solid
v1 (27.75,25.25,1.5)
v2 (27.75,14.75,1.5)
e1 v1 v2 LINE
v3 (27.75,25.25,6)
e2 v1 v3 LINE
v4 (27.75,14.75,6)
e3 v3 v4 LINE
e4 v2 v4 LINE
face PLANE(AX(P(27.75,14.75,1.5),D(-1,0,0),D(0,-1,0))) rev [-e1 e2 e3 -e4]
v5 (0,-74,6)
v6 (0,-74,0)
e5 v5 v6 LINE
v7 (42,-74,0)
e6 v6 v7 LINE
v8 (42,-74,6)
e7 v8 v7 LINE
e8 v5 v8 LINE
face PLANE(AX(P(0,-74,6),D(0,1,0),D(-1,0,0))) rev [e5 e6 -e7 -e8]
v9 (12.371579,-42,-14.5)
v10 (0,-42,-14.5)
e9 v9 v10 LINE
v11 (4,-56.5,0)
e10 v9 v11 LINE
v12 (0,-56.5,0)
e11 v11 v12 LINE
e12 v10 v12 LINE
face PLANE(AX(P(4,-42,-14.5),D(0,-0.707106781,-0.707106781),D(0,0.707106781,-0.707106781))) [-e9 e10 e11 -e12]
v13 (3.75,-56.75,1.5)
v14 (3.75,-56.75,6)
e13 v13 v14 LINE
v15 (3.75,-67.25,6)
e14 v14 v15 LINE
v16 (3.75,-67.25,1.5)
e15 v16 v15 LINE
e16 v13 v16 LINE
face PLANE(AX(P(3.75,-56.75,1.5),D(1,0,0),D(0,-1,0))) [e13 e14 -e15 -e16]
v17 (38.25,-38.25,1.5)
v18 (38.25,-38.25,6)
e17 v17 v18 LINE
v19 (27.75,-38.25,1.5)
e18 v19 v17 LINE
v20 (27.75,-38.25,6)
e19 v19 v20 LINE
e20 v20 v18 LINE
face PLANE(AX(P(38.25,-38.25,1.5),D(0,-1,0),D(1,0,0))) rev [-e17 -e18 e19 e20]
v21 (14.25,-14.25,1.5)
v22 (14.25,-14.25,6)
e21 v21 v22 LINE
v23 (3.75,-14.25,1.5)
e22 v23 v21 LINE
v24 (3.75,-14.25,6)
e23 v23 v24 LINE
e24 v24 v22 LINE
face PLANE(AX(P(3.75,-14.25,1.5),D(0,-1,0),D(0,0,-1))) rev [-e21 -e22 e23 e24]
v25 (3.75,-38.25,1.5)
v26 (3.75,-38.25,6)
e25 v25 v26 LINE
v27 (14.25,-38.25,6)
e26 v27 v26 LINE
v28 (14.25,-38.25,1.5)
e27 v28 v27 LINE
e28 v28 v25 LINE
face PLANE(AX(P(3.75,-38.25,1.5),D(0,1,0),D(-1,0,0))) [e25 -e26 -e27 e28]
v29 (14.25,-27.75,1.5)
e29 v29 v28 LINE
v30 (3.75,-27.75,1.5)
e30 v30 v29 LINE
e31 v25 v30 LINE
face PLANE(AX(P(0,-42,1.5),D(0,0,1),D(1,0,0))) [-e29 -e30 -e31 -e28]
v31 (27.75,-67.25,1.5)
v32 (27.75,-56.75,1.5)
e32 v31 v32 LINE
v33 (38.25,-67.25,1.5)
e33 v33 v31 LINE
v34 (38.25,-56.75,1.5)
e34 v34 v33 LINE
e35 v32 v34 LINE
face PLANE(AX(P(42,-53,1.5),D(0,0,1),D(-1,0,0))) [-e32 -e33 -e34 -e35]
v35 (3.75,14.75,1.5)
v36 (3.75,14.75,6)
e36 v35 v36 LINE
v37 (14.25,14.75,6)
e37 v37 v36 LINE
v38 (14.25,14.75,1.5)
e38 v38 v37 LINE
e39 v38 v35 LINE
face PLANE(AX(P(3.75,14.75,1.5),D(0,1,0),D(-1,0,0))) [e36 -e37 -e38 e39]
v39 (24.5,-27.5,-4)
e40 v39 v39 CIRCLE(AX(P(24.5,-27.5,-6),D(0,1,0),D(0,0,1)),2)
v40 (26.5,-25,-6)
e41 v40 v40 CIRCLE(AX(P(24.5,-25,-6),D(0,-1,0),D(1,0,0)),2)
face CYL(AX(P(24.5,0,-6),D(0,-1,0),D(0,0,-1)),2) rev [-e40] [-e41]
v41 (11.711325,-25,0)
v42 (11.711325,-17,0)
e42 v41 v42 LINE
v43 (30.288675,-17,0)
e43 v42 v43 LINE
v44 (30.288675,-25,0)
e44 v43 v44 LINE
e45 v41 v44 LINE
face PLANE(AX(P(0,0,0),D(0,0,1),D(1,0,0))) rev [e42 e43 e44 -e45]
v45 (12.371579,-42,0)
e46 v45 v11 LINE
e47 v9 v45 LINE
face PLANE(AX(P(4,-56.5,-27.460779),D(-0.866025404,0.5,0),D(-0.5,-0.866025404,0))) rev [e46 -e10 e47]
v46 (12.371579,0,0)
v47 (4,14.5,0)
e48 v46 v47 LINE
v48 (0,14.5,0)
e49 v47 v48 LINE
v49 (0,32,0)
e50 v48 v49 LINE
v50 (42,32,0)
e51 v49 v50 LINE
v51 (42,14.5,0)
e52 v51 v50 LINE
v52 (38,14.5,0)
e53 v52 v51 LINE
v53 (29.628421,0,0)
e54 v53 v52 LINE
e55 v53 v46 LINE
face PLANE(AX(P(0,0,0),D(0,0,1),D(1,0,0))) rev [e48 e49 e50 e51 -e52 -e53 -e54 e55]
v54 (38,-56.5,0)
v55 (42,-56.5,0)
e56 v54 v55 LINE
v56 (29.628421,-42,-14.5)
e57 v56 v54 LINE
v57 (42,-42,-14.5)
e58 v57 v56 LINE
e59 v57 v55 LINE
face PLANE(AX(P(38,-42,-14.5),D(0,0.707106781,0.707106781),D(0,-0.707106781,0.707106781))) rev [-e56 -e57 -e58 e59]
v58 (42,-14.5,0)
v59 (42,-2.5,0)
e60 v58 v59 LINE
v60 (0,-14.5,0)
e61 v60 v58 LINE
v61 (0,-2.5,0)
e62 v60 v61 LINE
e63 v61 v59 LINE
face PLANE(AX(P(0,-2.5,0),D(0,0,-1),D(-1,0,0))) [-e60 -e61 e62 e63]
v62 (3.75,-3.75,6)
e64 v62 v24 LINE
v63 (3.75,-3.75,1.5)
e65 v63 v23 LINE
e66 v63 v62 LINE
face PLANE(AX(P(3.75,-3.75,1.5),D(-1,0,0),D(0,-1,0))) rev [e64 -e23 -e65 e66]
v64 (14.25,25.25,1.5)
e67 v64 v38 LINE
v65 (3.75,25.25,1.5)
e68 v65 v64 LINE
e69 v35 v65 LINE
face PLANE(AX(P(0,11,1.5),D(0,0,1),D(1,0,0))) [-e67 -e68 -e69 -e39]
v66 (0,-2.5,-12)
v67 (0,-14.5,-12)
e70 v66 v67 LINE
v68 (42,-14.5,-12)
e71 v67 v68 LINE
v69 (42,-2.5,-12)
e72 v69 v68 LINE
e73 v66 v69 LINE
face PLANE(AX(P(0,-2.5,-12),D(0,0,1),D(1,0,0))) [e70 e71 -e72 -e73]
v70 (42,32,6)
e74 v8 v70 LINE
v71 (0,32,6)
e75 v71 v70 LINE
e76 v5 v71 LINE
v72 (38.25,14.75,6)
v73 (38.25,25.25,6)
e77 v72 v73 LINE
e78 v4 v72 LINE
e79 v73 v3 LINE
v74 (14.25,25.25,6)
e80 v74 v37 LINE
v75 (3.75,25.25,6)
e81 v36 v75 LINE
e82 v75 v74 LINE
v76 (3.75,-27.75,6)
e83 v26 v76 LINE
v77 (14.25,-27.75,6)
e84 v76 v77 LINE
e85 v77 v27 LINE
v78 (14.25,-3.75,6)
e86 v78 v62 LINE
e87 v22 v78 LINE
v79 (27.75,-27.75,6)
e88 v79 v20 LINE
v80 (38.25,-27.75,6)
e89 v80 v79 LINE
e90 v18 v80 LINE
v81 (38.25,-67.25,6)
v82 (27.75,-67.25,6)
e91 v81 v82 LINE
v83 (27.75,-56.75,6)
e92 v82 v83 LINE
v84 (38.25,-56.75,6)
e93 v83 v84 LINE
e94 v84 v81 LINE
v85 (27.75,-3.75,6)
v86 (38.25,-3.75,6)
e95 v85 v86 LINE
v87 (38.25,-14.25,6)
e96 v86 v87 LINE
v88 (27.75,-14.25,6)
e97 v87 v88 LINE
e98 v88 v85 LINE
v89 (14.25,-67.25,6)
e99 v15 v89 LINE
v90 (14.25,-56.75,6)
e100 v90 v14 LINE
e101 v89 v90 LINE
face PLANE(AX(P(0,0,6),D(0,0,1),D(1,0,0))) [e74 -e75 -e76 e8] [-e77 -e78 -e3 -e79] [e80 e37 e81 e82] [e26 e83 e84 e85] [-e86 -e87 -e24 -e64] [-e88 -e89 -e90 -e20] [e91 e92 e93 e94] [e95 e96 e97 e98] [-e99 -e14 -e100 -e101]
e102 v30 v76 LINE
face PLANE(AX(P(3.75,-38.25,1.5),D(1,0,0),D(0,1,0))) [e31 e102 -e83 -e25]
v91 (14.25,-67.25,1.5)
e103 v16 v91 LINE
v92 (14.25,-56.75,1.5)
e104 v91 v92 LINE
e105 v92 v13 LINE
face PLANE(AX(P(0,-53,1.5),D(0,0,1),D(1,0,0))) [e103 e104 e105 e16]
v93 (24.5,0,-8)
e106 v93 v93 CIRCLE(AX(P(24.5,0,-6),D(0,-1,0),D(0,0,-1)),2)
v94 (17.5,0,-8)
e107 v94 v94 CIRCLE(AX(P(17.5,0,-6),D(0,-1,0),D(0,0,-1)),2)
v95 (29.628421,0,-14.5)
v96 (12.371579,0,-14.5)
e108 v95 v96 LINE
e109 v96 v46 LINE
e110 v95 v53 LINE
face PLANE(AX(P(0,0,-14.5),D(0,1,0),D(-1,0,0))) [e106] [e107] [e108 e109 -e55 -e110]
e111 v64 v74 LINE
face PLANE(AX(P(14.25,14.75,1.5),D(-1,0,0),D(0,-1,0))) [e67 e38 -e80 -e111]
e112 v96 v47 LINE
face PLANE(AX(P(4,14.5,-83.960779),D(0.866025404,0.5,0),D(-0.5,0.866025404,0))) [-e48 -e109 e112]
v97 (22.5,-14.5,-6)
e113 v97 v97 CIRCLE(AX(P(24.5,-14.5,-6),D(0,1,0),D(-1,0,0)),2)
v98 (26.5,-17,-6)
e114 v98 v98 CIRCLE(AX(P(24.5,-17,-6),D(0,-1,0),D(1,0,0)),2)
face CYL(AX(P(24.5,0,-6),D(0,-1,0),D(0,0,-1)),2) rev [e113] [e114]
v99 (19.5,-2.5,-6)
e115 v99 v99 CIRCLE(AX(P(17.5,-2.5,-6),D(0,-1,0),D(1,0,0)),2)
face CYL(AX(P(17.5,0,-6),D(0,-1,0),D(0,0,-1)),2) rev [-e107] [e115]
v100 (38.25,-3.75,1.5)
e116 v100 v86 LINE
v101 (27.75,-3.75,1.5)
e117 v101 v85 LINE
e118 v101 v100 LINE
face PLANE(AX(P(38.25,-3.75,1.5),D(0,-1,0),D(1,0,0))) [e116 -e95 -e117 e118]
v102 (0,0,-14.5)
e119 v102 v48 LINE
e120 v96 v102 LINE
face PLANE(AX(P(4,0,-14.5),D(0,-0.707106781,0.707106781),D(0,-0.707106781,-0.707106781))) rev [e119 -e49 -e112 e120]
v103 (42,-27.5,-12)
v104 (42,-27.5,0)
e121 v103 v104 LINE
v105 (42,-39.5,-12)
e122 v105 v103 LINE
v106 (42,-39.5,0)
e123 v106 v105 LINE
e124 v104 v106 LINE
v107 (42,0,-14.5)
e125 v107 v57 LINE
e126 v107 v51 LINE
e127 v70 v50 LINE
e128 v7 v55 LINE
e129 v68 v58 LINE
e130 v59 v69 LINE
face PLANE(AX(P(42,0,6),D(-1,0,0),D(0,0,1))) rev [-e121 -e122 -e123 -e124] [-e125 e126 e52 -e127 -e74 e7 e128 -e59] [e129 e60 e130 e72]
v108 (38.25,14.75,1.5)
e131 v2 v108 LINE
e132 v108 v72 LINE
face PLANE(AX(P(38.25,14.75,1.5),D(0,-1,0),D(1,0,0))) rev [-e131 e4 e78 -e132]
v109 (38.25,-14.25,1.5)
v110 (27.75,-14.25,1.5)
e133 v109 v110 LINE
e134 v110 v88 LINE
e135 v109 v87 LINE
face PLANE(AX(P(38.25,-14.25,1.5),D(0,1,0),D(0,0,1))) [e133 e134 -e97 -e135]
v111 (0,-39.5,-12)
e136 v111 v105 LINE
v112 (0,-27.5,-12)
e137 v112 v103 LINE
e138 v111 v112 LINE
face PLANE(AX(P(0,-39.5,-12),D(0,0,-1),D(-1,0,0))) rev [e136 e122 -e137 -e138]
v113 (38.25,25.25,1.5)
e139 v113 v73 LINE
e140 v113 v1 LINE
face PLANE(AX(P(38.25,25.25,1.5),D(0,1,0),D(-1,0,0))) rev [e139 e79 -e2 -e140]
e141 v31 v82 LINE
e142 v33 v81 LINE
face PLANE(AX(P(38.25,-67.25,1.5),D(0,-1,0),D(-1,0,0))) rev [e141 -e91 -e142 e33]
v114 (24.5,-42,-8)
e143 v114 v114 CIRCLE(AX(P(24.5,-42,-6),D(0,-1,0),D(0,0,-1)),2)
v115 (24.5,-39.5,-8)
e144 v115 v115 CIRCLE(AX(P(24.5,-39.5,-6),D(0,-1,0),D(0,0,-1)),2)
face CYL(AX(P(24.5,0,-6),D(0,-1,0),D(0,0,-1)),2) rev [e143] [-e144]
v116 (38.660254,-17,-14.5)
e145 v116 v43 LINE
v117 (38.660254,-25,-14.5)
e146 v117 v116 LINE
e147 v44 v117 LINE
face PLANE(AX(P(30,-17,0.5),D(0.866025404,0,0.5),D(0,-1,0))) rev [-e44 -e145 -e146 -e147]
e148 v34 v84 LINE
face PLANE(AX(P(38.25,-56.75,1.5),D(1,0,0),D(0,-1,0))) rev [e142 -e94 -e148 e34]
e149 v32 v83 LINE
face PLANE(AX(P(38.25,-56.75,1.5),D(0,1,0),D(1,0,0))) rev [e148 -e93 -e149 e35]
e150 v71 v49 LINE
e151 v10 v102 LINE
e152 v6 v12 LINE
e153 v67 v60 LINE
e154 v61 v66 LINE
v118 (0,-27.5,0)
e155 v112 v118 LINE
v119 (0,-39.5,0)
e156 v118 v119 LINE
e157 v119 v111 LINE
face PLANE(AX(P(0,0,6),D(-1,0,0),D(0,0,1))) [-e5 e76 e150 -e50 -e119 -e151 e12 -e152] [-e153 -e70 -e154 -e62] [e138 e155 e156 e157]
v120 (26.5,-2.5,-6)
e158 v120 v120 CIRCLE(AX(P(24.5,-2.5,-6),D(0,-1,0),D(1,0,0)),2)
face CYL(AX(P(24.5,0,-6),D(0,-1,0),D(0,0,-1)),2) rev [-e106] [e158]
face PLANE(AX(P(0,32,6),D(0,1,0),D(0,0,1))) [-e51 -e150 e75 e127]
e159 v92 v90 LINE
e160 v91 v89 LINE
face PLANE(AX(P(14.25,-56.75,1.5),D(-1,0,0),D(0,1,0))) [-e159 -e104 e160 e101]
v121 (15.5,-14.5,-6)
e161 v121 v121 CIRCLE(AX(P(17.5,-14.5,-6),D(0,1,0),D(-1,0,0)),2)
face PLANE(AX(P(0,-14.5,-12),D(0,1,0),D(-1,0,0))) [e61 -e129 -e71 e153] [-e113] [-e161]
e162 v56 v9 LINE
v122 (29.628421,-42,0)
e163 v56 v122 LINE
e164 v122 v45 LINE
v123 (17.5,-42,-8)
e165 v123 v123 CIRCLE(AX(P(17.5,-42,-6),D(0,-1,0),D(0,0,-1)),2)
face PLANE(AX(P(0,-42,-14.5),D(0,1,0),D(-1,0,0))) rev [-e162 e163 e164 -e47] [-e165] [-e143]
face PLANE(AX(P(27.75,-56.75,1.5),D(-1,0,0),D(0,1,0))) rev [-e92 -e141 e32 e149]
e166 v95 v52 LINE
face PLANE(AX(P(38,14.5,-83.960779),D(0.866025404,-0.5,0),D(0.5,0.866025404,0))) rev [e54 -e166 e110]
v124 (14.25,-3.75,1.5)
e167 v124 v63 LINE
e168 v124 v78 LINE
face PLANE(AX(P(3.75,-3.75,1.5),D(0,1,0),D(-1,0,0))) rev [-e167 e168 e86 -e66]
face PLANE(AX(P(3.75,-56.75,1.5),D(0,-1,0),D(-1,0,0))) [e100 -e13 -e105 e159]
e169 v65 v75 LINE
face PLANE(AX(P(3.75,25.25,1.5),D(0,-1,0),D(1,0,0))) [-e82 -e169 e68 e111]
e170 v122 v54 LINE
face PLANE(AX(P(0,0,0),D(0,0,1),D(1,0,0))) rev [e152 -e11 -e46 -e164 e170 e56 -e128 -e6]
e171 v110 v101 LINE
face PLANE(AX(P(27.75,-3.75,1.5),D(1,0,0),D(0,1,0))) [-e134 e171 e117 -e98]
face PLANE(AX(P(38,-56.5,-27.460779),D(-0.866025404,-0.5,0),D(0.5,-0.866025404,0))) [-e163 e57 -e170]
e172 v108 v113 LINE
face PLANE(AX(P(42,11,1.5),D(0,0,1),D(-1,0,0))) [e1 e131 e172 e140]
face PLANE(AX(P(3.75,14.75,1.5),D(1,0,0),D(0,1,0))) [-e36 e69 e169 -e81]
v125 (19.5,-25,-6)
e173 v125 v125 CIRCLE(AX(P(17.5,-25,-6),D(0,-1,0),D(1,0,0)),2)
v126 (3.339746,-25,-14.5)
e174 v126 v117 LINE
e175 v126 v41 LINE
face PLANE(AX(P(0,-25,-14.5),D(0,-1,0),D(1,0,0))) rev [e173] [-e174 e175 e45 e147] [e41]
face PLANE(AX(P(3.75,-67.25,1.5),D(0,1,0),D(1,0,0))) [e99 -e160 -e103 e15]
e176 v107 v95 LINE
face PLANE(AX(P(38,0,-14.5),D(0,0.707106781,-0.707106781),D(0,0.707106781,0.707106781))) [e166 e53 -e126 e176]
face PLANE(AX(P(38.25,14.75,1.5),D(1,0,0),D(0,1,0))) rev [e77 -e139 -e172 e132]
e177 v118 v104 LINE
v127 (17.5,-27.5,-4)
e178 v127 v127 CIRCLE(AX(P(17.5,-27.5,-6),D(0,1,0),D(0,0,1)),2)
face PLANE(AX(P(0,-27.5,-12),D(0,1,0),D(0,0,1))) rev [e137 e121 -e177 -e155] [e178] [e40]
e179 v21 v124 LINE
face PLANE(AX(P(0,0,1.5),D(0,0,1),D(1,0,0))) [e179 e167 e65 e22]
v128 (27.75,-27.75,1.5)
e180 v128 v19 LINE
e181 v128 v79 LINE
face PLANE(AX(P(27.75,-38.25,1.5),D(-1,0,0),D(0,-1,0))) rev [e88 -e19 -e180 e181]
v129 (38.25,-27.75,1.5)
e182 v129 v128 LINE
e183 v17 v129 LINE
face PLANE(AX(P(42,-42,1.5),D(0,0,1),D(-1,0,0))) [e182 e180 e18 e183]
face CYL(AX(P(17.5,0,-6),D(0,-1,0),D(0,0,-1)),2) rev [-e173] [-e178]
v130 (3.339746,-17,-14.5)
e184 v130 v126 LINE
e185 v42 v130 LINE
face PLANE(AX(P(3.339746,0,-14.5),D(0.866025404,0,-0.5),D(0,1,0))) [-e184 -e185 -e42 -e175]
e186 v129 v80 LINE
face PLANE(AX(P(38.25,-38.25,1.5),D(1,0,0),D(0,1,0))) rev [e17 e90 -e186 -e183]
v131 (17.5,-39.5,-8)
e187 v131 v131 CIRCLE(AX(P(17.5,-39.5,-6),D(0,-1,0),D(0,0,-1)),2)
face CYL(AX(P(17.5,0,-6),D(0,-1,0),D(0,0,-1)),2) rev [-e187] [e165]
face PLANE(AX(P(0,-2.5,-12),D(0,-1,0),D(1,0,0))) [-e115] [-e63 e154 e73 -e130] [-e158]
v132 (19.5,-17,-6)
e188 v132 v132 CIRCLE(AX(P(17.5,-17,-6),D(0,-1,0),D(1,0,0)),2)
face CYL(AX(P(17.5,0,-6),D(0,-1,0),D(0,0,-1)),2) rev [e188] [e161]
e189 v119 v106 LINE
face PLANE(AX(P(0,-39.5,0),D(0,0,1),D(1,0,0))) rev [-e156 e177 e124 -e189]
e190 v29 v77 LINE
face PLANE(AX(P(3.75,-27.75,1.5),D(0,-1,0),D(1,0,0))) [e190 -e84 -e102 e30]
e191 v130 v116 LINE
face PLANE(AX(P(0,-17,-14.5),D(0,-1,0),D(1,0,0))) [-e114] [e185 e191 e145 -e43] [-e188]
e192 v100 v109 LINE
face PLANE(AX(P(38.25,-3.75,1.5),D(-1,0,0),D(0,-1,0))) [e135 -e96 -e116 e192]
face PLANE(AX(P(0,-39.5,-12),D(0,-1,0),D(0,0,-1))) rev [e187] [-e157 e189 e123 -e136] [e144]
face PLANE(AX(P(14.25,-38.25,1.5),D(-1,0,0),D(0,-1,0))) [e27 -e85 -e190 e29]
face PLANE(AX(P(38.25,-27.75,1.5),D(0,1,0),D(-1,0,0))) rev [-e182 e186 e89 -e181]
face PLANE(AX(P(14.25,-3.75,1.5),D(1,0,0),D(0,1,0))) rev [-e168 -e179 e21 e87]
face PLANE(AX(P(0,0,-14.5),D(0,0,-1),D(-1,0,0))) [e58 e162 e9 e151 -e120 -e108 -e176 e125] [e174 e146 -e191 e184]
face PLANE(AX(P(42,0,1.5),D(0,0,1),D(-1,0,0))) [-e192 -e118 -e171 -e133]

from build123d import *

# Parameters (mm, degrees)
ESQUISSE1_W                  = 42
ESQUISSE1_H                  = 106
BOSS_EXTRU_1_DEPTH           = 6
ESQUISSE2_W                  = 42
ESQUISSE2_H                  = 17
BOSS_EXTRU_3_DEPTH           = 14.5
ESQUISSE3_W                  = 12
ESQUISSE3_H                  = 12
ENL_V_MAT_EXTRU_3_DEPTH      = 87.314830707
ESQUISSE4_R                  = 2
ENL_V_MAT_EXTRU_4_DEPTH      = 42
ESQUISSE5_W                  = 10.5
ESQUISSE5_H                  = 10.5
ENL_V_MAT_EXTRU_5_DEPTH      = 4.5
SYM_TRIE3_COPY_1_SKETCH_W    = 10.5
SYM_TRIE3_COPY_1_SKETCH_H    = 10.5
SYM_TRIE3_COPY_1_DEPTH       = 4.5
SYM_TRIE4_COPY_1_SKETCH_W    = 10.5
SYM_TRIE4_COPY_1_SKETCH_H    = 10.5
SYM_TRIE4_COPY_1_DEPTH       = 4.5
SYM_TRIE5_COPY_1_SKETCH_W    = 10.5
SYM_TRIE5_COPY_1_SKETCH_H    = 10.5
SYM_TRIE5_COPY_1_DEPTH       = 4.5
SYM_TRIE5_COPY_2_SKETCH_W    = 10.5
SYM_TRIE5_COPY_2_SKETCH_H    = 10.5
SYM_TRIE5_COPY_2_DEPTH       = 4.5
SYM_TRIE5_COPY_3_SKETCH_W    = 10.5
SYM_TRIE5_COPY_3_SKETCH_H    = 10.5
SYM_TRIE5_COPY_3_DEPTH       = 4.5
BOSS_EXTRU_4_DEPTH           = 4
BOSS_EXTRU_5_REACH           = 88.315
R_P_TITION_CIRCULAIRE1_COUNT = 2
SYM_TRIE6_COPY_1_DEPTH       = 4
SYM_TRIE6_COPY_2_REACH       = 88.315
ESQUISSE8_W                  = 12
ESQUISSE8_H                  = 8
BOSS_EXTRU_6_DEPTH           = 14.5
CHANFREIN2_SIZE              = 15
CHANFREIN2_SIZE_2            = 8.660254038
SYM_TRIE7_START              = -25
SYM_TRIE7_DEPTH              = 8


# Read off the part's stored shape, not the designer's step: Symétrie7
with BuildPart() as part:
    # Esquisse1 → Boss.-Extru.1 (new body)
    with BuildSketch(Plane.XY):
        with Locations((21, -21)):
            Rectangle(ESQUISSE1_W, ESQUISSE1_H)
    extrude(amount=BOSS_EXTRU_1_DEPTH)

    # Esquisse2 → Boss.-Extru.3 (add)
    with BuildSketch(Plane(origin=(0, 0, 0), x_dir=(-1, 0, 0), z_dir=(0, 0, -1))):
        with Locations((-21, -33.5)):
            Rectangle(ESQUISSE2_W, ESQUISSE2_H)
    boss_extru_3 = extrude(amount=BOSS_EXTRU_3_DEPTH)

    # Esquisse3 → Enlèv. mat.-Extru.3 (cut, through all)
    with BuildSketch(Plane(origin=(42, 0, 0), x_dir=(0, 0, -1), z_dir=(1, 0, 0))):
        with Locations((6, -33.5)):
            Rectangle(ESQUISSE3_W, ESQUISSE3_H)
    enl_v_mat_extru_3 = extrude(amount=-ENL_V_MAT_EXTRU_3_DEPTH, mode=Mode.SUBTRACT)

    # Symétrie1: Boss.-Extru.3, Enlèv. mat.-Extru.3 across plane
    add(boss_extru_3.mirror(Plane(origin=(0, -21, 0), x_dir=(0, 0, 1), z_dir=(0, -1, 0))))
    add(enl_v_mat_extru_3.mirror(Plane(origin=(0, -21, 0), x_dir=(0, 0, 1), z_dir=(0, -1, 0))), mode=Mode.SUBTRACT)

    # Esquisse4 → Enlèv. mat.-Extru.4 (cut)
    with BuildSketch(Plane.XZ.offset(42)):
        with Locations(Location((24.5, -6, 0), (0, 0, 270))):
            Circle(ESQUISSE4_R)
        with Locations(Location((17.5, -6, 0), (0, 0, 270))):
            Circle(ESQUISSE4_R)
    extrude(amount=-ENL_V_MAT_EXTRU_4_DEPTH, mode=Mode.SUBTRACT)

    # Esquisse5 → Enlèv. mat.-Extru.5 (cut)
    with BuildSketch(Plane.XY.offset(6)):
        with Locations((9, -9)):
            Rectangle(ESQUISSE5_W, ESQUISSE5_H)
    enl_v_mat_extru_5 = extrude(amount=-ENL_V_MAT_EXTRU_5_DEPTH, mode=Mode.SUBTRACT)

    # Symétrie2: Enlèv. mat.-Extru.5 across plane
    add(enl_v_mat_extru_5.mirror(Plane(origin=(21, 0, 0), x_dir=(0, 0, 1), z_dir=(1, 0, 0))), mode=Mode.SUBTRACT)

    # Symétrie3: Enlèv. mat.-Extru.5 across plane
    add(enl_v_mat_extru_5.mirror(Plane(origin=(0, -21, 0), x_dir=(0, 0, 1), z_dir=(0, -1, 0))), mode=Mode.SUBTRACT)

    # Symétrie3 copy 1 sketch → Symétrie3 copy 1 (cut)
    with BuildSketch(Plane(origin=(42, -42, 6), x_dir=(-1, 0, 0), z_dir=(0, 0, 1))):
        with Locations((9, -9)):
            Rectangle(SYM_TRIE3_COPY_1_SKETCH_W, SYM_TRIE3_COPY_1_SKETCH_H)
    extrude(amount=-SYM_TRIE3_COPY_1_DEPTH, mode=Mode.SUBTRACT)

    # Symétrie4: Enlèv. mat.-Extru.5 across plane
    add(enl_v_mat_extru_5.mirror(Plane(origin=(0, 5.5, 0), x_dir=(0, 0, 1), z_dir=(0, -1, 0))), mode=Mode.SUBTRACT)

    # Symétrie4 copy 1 sketch → Symétrie4 copy 1 (cut)
    with BuildSketch(Plane(origin=(42, 11, 6), x_dir=(-1, 0, 0), z_dir=(0, 0, 1))):
        with Locations((9, -9)):
            Rectangle(SYM_TRIE4_COPY_1_SKETCH_W, SYM_TRIE4_COPY_1_SKETCH_H)
    extrude(amount=-SYM_TRIE4_COPY_1_DEPTH, mode=Mode.SUBTRACT)

    # Symétrie5 copy 1 sketch → Symétrie5 copy 1 (cut)
    with BuildSketch(Plane(origin=(0, -53, 6), x_dir=(1, 0, 0), z_dir=(0, 0, 1))):
        with Locations((9, -9)):
            Rectangle(SYM_TRIE5_COPY_1_SKETCH_W, SYM_TRIE5_COPY_1_SKETCH_H)
    extrude(amount=-SYM_TRIE5_COPY_1_DEPTH, mode=Mode.SUBTRACT)

    # Symétrie5 copy 2 sketch → Symétrie5 copy 2 (cut)
    with BuildSketch(Plane(origin=(42, -53, 6), x_dir=(-1, 0, 0), z_dir=(0, 0, 1))):
        with Locations((9, 9)):
            Rectangle(SYM_TRIE5_COPY_2_SKETCH_W, SYM_TRIE5_COPY_2_SKETCH_H)
    extrude(amount=-SYM_TRIE5_COPY_2_DEPTH, mode=Mode.SUBTRACT)

    # Symétrie5 copy 3 sketch → Symétrie5 copy 3 (cut)
    with BuildSketch(Plane(origin=(0, -95, 6), x_dir=(1, 0, 0), z_dir=(0, 0, 1))):
        with Locations((9, 9)):
            Rectangle(SYM_TRIE5_COPY_3_SKETCH_W, SYM_TRIE5_COPY_3_SKETCH_H)
    extrude(amount=-SYM_TRIE5_COPY_3_DEPTH, mode=Mode.SUBTRACT)

    # Esquisse6 → Boss.-Extru.4 (add)
    with BuildSketch(Plane.ZY):
        Polygon((-14.5, -42), (0, -56.5), (0, -42), align=None)
    boss_extru_4 = extrude(amount=-BOSS_EXTRU_4_DEPTH)

    # Boss.-Extru.5: up to this face of the body (flat: up to its plane)
    boss_extru_5_end = Plane(part.part.faces().sort_by_distance((2, -49.25, -7.25))[0])
    # Esquisse7 → Boss.-Extru.5 (add, up to the picked face)
    with BuildSketch(Plane(origin=(0, 0, 0), x_dir=(-1, 0, 0), z_dir=(0, 0, -1)), mode=Mode.PRIVATE) as boss_extru_5_sk1:
        Polygon((-4, -56.5), (-12.371578903, -42), (-4, -42), align=None)
    boss_extru_5_tool1 = split(extrude(boss_extru_5_sk1.sketch, amount=BOSS_EXTRU_5_REACH, mode=Mode.PRIVATE), bisect_by=boss_extru_5_end, keep=Keep.BOTH, mode=Mode.PRIVATE)
    boss_extru_5 = boss_extru_5_tool1.solids().sort_by(Axis((6.790526, -46.833333, 0), (0, 0, -1)))[0]
    add(boss_extru_5)

    # Répétition circulaire1: Boss.-Extru.4, Boss.-Extru.5 ×2 about axis
    r_p_tition_circulaire1_axis = Axis((21, -21, 0), (0, 0, 1))
    add([boss_extru_4.rotate(r_p_tition_circulaire1_axis, i * 360 / R_P_TITION_CIRCULAIRE1_COUNT) for i in range(1, R_P_TITION_CIRCULAIRE1_COUNT)])
    add([boss_extru_5.rotate(r_p_tition_circulaire1_axis, i * 360 / R_P_TITION_CIRCULAIRE1_COUNT) for i in range(1, R_P_TITION_CIRCULAIRE1_COUNT)])

    # Symétrie6: Boss.-Extru.4, Boss.-Extru.5 across plane
    add(boss_extru_4.mirror(Plane(origin=(21, 0, 0), x_dir=(0, 0, 1), z_dir=(1, 0, 0))))
    add(boss_extru_5.mirror(Plane(origin=(21, 0, 0), x_dir=(0, 0, 1), z_dir=(1, 0, 0))))

    # Symétrie6 copy 1 sketch → Symétrie6 copy 1 (add)
    with BuildSketch(Plane(origin=(0, -42, 0), x_dir=(0, 0, 1), z_dir=(-1, 0, 0))):
        Polygon((-14.5, 42), (0, 56.5), (0, 42), align=None)
    extrude(amount=-SYM_TRIE6_COPY_1_DEPTH)

    # Symétrie6 copy 2: up to this face of the body (flat: up to its plane)
    sym_trie6_copy_2_end = Plane(part.part.faces().sort_by_distance((2, 7.25, -7.25))[0])
    # Symétrie6 copy 2 sketch → Symétrie6 copy 2 (add, up to the picked face)
    with BuildSketch(Plane(origin=(0, -42, 0), x_dir=(-1, 0, 0), z_dir=(0, 0, -1)), mode=Mode.PRIVATE) as sym_trie6_copy_2_sk1:
        Polygon((-4, 56.5), (-12.371578903, 42), (-4, 42), align=None)
    sym_trie6_copy_2_tool1 = split(extrude(sym_trie6_copy_2_sk1.sketch, amount=SYM_TRIE6_COPY_2_REACH, mode=Mode.PRIVATE), bisect_by=sym_trie6_copy_2_end, keep=Keep.BOTH, mode=Mode.PRIVATE)
    add(sym_trie6_copy_2_tool1.solids().sort_by(Axis((6.790526, 4.833333, 0), (0, 0, -1)))[0])

    # Esquisse8 → Boss.-Extru.6 (add)
    with BuildSketch(Plane(origin=(0, 0, 0), x_dir=(-1, 0, 0), z_dir=(0, 0, -1))):
        with Locations((-6, -21)):
            Rectangle(ESQUISSE8_W, ESQUISSE8_H)
    extrude(amount=BOSS_EXTRU_6_DEPTH)

    # Chanfrein2
    # the kernel refuses this chamfer: 15, 8.660254038 mm, written as the material it adds along each edge
    # the kernel refuses this chamfer: 15, 8.660254038 mm, written as the material it takes off along each edge
    with BuildSketch(Plane(origin=(12, -17, -14.5), x_dir=(0.01932676561270075, 0, 0.9998132206222079), z_dir=(0, -1, 0))) as chanfrein2_2_piece_1_section:
        Polygon((CHANFREIN2_SIZE * 0.999813220622, CHANFREIN2_SIZE * 0.0193267656127), (-CHANFREIN2_SIZE_2 * 0.0193267656124, CHANFREIN2_SIZE_2 * 0.999813220604), (0, 0), align=None)
    chanfrein2_2_piece_1 = extrude(amount=8, mode=Mode.PRIVATE)
    chanfrein2_2_piece_1 = split(chanfrein2_2_piece_1, bisect_by=Plane(origin=(9.590672915, -21, 0), z_dir=(0, 0, -1)), keep=Keep.TOP, mode=Mode.PRIVATE)
    add(chanfrein2_2_piece_1, mode=Mode.SUBTRACT)

    # Symétrie7 outline → Symétrie7 (add)
    with BuildSketch(Plane(origin=(0, 0, 0), x_dir=(1, 0, 0), z_dir=(0, 1, 0)).offset(SYM_TRIE7_START)):
        Polygon((42, 0), (42, 14.5), (38.660254038, 14.5), (30.288675135, 0), align=None)
    extrude(amount=SYM_TRIE7_DEPTH)


solid = part.part
